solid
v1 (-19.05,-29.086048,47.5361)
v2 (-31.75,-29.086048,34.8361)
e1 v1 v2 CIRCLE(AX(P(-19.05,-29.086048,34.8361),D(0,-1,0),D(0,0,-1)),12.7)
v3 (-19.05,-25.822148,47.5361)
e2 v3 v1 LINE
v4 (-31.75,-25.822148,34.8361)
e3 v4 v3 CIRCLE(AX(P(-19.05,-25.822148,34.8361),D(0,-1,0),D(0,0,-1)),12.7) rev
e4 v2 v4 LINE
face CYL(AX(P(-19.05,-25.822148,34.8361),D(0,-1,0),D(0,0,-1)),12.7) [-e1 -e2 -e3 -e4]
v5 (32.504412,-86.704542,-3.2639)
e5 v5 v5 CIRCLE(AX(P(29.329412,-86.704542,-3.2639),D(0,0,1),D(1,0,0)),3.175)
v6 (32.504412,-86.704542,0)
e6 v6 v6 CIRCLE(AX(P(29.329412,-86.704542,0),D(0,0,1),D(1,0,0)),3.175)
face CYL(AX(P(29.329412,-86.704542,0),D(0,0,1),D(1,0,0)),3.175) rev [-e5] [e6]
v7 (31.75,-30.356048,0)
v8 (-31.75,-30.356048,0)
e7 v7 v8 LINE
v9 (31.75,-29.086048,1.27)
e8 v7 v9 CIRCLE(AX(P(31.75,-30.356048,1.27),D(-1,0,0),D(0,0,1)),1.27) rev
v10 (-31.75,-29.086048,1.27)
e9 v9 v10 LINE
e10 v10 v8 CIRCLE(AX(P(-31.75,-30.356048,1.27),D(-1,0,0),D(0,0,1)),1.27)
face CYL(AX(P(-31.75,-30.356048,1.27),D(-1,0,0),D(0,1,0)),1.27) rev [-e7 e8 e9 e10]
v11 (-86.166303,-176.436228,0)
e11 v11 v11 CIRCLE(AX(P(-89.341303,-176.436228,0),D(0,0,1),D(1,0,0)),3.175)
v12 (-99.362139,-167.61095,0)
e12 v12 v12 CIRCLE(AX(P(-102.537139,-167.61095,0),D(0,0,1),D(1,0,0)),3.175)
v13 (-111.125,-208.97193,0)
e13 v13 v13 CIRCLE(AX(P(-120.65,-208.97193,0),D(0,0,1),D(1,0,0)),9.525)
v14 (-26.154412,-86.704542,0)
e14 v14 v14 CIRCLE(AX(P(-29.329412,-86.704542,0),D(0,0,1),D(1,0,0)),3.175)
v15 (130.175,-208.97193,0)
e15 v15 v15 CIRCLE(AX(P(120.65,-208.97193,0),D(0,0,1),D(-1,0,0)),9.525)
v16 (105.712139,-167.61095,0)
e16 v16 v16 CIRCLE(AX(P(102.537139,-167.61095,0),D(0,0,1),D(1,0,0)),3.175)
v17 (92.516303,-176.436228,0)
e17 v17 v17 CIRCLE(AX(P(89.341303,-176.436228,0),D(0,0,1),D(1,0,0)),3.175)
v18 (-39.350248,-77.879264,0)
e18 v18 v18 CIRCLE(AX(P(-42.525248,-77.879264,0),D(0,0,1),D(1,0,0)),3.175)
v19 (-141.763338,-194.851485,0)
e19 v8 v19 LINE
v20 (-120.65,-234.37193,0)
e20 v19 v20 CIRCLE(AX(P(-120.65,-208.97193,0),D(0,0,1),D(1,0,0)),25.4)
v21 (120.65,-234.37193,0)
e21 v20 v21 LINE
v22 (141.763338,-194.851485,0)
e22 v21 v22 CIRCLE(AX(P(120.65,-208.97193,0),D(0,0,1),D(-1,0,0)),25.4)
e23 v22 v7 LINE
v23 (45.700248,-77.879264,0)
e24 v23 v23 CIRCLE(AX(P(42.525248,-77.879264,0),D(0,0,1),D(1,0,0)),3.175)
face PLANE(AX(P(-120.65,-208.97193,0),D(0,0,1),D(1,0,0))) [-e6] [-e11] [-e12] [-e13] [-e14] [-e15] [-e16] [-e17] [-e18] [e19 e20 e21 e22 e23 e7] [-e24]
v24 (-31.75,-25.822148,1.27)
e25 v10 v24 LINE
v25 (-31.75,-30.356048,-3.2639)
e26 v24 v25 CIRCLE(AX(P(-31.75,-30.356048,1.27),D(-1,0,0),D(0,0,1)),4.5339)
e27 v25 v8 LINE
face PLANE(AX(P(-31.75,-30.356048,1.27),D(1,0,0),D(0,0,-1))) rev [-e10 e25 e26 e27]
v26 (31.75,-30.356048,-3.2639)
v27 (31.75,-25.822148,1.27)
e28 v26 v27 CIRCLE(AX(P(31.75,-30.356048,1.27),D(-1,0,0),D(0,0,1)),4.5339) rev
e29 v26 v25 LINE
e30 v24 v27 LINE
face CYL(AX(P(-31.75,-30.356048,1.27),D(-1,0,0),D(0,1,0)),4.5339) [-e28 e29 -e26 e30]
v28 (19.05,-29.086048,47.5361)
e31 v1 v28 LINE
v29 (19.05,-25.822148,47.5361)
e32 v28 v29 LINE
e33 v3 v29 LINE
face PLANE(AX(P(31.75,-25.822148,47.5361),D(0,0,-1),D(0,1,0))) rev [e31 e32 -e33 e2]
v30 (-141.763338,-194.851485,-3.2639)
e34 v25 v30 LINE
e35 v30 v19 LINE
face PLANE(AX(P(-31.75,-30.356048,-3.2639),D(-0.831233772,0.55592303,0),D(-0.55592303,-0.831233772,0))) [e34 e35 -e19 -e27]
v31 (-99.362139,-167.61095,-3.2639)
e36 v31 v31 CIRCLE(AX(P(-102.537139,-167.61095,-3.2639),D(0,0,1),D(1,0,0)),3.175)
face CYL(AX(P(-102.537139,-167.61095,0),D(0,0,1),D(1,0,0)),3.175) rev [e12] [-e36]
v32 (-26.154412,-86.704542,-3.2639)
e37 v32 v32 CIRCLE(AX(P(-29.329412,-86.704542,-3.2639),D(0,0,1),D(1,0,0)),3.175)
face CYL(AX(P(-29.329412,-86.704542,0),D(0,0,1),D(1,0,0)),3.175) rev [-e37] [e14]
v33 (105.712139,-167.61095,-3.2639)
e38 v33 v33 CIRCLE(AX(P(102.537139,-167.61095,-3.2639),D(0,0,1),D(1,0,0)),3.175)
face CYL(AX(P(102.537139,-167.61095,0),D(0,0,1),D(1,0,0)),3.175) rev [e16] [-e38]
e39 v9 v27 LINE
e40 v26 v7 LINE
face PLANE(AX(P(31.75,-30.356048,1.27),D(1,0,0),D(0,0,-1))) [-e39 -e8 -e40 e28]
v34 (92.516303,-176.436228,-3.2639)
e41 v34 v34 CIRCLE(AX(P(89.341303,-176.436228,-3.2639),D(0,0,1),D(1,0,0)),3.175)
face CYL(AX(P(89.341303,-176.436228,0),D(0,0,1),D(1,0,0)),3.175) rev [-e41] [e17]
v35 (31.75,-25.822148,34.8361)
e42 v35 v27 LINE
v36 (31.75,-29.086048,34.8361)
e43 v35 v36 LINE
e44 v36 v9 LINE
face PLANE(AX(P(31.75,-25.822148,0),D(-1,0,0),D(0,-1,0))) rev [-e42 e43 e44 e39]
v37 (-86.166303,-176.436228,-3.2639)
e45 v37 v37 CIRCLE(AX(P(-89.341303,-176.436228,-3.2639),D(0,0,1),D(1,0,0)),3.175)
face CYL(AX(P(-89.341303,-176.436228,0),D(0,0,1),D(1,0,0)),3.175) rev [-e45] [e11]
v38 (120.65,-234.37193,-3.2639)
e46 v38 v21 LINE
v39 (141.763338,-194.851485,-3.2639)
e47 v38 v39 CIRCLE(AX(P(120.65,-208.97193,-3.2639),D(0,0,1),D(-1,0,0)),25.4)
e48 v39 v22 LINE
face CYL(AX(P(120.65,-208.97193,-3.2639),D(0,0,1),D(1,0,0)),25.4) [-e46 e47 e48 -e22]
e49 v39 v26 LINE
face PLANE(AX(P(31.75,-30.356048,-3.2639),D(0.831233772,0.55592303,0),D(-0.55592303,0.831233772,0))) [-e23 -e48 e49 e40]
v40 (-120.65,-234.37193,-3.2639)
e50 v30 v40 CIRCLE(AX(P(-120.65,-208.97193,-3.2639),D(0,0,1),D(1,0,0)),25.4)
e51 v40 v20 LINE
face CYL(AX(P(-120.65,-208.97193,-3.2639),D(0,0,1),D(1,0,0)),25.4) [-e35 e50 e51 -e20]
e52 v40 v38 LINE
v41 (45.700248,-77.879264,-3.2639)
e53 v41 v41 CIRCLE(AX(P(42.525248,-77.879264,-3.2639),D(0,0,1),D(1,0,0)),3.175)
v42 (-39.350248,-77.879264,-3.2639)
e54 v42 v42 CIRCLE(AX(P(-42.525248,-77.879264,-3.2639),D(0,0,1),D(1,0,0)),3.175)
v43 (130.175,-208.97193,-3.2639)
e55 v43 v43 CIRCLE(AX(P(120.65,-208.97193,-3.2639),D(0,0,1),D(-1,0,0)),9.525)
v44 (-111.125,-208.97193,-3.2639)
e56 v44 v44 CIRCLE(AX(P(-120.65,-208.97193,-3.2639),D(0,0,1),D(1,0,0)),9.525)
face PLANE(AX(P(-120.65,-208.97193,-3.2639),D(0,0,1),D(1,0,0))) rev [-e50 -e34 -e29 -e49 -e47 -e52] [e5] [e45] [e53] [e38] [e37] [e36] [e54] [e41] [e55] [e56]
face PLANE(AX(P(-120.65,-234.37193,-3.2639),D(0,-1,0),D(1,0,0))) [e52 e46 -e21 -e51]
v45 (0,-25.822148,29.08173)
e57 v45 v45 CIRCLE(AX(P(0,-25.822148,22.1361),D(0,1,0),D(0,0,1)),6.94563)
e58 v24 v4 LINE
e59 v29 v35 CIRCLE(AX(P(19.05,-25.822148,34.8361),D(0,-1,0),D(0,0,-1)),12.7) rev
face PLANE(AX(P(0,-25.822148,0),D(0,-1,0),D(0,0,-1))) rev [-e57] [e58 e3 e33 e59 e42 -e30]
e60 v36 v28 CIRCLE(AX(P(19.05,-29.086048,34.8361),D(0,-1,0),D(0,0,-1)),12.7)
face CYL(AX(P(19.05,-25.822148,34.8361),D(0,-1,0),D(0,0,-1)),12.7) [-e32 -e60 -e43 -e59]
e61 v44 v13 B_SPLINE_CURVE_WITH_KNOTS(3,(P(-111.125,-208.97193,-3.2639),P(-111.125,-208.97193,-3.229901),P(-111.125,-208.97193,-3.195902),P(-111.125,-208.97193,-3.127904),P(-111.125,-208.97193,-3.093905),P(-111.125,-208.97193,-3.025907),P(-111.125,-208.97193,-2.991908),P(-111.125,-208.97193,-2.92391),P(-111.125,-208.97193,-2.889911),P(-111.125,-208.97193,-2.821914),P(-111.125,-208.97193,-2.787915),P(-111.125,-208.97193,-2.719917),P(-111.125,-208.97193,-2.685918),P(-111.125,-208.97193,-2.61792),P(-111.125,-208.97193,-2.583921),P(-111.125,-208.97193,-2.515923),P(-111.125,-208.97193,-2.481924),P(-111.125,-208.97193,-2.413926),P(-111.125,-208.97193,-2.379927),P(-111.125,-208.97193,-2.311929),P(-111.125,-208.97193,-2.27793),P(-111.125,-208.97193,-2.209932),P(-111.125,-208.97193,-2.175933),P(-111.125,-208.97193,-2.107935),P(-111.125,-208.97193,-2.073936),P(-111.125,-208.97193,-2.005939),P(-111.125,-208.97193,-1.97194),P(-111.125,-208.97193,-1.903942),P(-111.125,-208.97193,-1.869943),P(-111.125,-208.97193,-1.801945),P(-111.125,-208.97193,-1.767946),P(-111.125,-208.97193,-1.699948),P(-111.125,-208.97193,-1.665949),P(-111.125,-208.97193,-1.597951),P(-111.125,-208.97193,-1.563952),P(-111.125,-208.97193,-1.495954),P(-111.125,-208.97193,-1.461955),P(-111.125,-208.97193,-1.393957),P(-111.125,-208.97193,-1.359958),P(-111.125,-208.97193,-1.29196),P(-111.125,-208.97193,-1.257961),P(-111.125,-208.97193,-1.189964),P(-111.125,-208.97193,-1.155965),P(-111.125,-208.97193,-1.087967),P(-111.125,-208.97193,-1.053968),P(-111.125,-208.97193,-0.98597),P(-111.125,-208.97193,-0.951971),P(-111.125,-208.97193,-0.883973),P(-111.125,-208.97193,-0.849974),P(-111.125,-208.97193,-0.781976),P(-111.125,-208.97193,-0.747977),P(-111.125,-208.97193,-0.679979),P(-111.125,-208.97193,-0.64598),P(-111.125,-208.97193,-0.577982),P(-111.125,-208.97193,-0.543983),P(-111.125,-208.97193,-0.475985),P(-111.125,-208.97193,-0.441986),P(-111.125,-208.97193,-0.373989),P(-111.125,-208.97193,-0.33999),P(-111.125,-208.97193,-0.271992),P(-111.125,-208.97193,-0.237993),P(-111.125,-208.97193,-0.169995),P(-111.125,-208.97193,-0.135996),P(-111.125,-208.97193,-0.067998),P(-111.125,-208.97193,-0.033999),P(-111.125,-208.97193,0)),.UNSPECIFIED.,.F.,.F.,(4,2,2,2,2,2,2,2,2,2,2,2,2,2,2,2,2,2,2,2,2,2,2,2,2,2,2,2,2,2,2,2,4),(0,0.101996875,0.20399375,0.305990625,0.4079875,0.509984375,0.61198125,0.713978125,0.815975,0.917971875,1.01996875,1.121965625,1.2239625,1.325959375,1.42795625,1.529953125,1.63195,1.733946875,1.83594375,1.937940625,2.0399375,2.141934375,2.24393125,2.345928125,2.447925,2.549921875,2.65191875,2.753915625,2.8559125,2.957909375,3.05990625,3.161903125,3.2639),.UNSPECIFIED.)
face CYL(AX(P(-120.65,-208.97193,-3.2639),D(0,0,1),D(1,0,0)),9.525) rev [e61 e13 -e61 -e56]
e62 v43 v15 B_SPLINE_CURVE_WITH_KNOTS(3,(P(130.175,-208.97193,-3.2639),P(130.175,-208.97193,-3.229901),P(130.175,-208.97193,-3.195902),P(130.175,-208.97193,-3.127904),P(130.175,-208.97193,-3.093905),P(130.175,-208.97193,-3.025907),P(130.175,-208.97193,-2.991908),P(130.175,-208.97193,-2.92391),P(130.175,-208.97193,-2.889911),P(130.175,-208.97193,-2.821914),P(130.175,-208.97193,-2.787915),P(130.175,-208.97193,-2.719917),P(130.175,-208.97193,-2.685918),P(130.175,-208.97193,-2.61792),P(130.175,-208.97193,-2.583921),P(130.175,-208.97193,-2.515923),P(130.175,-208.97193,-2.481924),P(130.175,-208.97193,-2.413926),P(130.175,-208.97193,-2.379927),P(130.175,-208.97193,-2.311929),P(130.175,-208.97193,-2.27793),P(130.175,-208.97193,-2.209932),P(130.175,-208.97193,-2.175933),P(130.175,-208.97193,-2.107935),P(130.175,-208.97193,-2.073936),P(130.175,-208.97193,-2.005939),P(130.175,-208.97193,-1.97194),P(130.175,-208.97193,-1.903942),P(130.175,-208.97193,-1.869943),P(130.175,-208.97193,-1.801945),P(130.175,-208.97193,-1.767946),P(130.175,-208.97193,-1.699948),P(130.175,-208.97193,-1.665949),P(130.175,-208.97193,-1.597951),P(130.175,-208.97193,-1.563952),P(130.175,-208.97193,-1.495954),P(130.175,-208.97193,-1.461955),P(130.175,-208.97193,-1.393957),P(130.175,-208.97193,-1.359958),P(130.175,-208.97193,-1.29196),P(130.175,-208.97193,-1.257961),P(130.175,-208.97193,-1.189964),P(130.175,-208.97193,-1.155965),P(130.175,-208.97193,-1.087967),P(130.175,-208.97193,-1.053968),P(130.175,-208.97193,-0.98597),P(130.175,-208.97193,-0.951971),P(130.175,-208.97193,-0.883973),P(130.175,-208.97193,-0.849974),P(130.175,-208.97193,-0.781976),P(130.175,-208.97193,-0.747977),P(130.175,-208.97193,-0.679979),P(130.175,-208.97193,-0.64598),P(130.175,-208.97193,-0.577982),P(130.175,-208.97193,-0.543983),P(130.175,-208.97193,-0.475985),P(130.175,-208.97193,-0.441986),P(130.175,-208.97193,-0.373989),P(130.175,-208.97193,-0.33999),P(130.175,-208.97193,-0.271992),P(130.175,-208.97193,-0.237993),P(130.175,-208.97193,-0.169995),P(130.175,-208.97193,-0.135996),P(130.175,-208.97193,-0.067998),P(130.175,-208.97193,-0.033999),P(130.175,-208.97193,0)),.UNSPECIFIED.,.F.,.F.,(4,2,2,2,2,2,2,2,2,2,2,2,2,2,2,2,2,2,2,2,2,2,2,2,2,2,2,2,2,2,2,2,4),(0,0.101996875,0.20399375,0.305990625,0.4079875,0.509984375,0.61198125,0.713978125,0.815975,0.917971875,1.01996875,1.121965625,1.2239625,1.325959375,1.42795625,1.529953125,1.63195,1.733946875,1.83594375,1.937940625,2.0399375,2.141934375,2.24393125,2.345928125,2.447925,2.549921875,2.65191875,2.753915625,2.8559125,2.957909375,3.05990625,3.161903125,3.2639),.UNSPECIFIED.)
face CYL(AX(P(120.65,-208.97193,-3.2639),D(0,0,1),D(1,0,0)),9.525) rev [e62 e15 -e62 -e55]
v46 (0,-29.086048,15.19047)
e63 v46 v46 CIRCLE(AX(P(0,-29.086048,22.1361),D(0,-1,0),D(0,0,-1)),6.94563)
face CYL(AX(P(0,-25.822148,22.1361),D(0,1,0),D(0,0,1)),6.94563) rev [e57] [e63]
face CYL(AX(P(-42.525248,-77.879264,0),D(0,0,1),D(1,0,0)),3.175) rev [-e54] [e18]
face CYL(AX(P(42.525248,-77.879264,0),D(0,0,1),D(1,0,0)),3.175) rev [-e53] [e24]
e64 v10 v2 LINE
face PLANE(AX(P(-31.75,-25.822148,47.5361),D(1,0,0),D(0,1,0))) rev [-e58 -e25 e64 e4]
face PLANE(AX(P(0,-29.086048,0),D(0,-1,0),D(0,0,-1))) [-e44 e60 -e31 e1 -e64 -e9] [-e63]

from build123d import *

# Parameters (mm, degrees)
SKETCH_S_R                 = 9.525
BASE_FLANGE1_DEPTH         = 3.2639
F_1_4_0_2500_DOWEL_HOLE2_D = 6.35
EDGE_FLANGE1_DEPTH         = 63.5
F_1_2_CLEARANCE_HOLE1_D    = 13.89126
FILLET1_R                  = 12.7


# Sheet-metal steps are written as plain solids
with BuildPart() as part:
    # s → Base-Flange1 (new body)
    with BuildSketch(Plane.XY):
        with BuildLine():
            Line((31.75, -30.356048), (-31.75, -30.356048))
            Line((-31.75, -30.356048), (-141.763337817, -194.851484961))
            ThreePointArc((-141.763337817, -194.851484961), (-143.053340178, -220.94065371), (-120.65, -234.371929933))
            Line((-120.65, -234.371929933), (120.65, -234.371929933))
            ThreePointArc((120.65, -234.371929933), (143.053340178, -220.94065371), (141.763337817, -194.851484961))
            Line((141.763337817, -194.851484961), (31.75, -30.356048))
        make_face()
        with Locations((-120.65, -208.971929933)):
            Circle(SKETCH_S_R, mode=Mode.SUBTRACT)
        with Locations((120.65, -208.971929933)):
            Circle(SKETCH_S_R, mode=Mode.SUBTRACT)
    extrude(amount=-BASE_FLANGE1_DEPTH)

    # 1/4 (0.2500) Dowel Hole2 (through all)
    with Locations(Plane.XY):
        with Locations((-102.537139367, -167.610949699), (-89.341303231, -176.436227806), (-42.525248236, -77.879263975), (-29.3294121, -86.704542082), (29.3294121, -86.704542082), (42.525248236, -77.879263975), (89.341303231, -176.436227806), (102.537139367, -167.610949699)):
            Hole(F_1_4_0_2500_DOWEL_HOLE2_D / 2)

    # Edge-Flange1 section (across the edge) → Edge-Flange1 (add)
    with BuildSketch(Plane(origin=(31.75, -29.086048, 0), x_dir=(0, -1, 0), z_dir=(-1, 0, 0))):
        with BuildLine():
            Line((-3.2639, 1.27), (-3.2639, 47.5361))
            Line((-3.2639, 47.5361), (0, 47.5361))
            Line((0, 47.5361), (0, 1.27))
            ThreePointArc((0, 1.27), (0.371974388, 0.371974388), (1.27, 0))
            Line((1.27, 0), (1.27, -3.2639))
            ThreePointArc((1.27, -3.2639), (-1.935951435, -1.935951435), (-3.2639, 1.27))
        make_face()
    extrude(amount=EDGE_FLANGE1_DEPTH)

    # 1/2 Clearance Hole1 (through all)
    with Locations(Plane(origin=(0, -25.822148, 0), x_dir=(1, 0, 0), z_dir=(0, 1, 0))):
        with Locations((0, -22.1361)):
            Hole(F_1_2_CLEARANCE_HOLE1_D / 2)

    # Fillet1
    fillet1_edges = [part.edges().sort_by_distance(p)[0] for p in [
        (31.75, -27.454098, 47.5361),
        (-31.75, -27.454098, 47.5361),
    ]]
    fillet(fillet1_edges, radius=FILLET1_R)


solid = part.part
